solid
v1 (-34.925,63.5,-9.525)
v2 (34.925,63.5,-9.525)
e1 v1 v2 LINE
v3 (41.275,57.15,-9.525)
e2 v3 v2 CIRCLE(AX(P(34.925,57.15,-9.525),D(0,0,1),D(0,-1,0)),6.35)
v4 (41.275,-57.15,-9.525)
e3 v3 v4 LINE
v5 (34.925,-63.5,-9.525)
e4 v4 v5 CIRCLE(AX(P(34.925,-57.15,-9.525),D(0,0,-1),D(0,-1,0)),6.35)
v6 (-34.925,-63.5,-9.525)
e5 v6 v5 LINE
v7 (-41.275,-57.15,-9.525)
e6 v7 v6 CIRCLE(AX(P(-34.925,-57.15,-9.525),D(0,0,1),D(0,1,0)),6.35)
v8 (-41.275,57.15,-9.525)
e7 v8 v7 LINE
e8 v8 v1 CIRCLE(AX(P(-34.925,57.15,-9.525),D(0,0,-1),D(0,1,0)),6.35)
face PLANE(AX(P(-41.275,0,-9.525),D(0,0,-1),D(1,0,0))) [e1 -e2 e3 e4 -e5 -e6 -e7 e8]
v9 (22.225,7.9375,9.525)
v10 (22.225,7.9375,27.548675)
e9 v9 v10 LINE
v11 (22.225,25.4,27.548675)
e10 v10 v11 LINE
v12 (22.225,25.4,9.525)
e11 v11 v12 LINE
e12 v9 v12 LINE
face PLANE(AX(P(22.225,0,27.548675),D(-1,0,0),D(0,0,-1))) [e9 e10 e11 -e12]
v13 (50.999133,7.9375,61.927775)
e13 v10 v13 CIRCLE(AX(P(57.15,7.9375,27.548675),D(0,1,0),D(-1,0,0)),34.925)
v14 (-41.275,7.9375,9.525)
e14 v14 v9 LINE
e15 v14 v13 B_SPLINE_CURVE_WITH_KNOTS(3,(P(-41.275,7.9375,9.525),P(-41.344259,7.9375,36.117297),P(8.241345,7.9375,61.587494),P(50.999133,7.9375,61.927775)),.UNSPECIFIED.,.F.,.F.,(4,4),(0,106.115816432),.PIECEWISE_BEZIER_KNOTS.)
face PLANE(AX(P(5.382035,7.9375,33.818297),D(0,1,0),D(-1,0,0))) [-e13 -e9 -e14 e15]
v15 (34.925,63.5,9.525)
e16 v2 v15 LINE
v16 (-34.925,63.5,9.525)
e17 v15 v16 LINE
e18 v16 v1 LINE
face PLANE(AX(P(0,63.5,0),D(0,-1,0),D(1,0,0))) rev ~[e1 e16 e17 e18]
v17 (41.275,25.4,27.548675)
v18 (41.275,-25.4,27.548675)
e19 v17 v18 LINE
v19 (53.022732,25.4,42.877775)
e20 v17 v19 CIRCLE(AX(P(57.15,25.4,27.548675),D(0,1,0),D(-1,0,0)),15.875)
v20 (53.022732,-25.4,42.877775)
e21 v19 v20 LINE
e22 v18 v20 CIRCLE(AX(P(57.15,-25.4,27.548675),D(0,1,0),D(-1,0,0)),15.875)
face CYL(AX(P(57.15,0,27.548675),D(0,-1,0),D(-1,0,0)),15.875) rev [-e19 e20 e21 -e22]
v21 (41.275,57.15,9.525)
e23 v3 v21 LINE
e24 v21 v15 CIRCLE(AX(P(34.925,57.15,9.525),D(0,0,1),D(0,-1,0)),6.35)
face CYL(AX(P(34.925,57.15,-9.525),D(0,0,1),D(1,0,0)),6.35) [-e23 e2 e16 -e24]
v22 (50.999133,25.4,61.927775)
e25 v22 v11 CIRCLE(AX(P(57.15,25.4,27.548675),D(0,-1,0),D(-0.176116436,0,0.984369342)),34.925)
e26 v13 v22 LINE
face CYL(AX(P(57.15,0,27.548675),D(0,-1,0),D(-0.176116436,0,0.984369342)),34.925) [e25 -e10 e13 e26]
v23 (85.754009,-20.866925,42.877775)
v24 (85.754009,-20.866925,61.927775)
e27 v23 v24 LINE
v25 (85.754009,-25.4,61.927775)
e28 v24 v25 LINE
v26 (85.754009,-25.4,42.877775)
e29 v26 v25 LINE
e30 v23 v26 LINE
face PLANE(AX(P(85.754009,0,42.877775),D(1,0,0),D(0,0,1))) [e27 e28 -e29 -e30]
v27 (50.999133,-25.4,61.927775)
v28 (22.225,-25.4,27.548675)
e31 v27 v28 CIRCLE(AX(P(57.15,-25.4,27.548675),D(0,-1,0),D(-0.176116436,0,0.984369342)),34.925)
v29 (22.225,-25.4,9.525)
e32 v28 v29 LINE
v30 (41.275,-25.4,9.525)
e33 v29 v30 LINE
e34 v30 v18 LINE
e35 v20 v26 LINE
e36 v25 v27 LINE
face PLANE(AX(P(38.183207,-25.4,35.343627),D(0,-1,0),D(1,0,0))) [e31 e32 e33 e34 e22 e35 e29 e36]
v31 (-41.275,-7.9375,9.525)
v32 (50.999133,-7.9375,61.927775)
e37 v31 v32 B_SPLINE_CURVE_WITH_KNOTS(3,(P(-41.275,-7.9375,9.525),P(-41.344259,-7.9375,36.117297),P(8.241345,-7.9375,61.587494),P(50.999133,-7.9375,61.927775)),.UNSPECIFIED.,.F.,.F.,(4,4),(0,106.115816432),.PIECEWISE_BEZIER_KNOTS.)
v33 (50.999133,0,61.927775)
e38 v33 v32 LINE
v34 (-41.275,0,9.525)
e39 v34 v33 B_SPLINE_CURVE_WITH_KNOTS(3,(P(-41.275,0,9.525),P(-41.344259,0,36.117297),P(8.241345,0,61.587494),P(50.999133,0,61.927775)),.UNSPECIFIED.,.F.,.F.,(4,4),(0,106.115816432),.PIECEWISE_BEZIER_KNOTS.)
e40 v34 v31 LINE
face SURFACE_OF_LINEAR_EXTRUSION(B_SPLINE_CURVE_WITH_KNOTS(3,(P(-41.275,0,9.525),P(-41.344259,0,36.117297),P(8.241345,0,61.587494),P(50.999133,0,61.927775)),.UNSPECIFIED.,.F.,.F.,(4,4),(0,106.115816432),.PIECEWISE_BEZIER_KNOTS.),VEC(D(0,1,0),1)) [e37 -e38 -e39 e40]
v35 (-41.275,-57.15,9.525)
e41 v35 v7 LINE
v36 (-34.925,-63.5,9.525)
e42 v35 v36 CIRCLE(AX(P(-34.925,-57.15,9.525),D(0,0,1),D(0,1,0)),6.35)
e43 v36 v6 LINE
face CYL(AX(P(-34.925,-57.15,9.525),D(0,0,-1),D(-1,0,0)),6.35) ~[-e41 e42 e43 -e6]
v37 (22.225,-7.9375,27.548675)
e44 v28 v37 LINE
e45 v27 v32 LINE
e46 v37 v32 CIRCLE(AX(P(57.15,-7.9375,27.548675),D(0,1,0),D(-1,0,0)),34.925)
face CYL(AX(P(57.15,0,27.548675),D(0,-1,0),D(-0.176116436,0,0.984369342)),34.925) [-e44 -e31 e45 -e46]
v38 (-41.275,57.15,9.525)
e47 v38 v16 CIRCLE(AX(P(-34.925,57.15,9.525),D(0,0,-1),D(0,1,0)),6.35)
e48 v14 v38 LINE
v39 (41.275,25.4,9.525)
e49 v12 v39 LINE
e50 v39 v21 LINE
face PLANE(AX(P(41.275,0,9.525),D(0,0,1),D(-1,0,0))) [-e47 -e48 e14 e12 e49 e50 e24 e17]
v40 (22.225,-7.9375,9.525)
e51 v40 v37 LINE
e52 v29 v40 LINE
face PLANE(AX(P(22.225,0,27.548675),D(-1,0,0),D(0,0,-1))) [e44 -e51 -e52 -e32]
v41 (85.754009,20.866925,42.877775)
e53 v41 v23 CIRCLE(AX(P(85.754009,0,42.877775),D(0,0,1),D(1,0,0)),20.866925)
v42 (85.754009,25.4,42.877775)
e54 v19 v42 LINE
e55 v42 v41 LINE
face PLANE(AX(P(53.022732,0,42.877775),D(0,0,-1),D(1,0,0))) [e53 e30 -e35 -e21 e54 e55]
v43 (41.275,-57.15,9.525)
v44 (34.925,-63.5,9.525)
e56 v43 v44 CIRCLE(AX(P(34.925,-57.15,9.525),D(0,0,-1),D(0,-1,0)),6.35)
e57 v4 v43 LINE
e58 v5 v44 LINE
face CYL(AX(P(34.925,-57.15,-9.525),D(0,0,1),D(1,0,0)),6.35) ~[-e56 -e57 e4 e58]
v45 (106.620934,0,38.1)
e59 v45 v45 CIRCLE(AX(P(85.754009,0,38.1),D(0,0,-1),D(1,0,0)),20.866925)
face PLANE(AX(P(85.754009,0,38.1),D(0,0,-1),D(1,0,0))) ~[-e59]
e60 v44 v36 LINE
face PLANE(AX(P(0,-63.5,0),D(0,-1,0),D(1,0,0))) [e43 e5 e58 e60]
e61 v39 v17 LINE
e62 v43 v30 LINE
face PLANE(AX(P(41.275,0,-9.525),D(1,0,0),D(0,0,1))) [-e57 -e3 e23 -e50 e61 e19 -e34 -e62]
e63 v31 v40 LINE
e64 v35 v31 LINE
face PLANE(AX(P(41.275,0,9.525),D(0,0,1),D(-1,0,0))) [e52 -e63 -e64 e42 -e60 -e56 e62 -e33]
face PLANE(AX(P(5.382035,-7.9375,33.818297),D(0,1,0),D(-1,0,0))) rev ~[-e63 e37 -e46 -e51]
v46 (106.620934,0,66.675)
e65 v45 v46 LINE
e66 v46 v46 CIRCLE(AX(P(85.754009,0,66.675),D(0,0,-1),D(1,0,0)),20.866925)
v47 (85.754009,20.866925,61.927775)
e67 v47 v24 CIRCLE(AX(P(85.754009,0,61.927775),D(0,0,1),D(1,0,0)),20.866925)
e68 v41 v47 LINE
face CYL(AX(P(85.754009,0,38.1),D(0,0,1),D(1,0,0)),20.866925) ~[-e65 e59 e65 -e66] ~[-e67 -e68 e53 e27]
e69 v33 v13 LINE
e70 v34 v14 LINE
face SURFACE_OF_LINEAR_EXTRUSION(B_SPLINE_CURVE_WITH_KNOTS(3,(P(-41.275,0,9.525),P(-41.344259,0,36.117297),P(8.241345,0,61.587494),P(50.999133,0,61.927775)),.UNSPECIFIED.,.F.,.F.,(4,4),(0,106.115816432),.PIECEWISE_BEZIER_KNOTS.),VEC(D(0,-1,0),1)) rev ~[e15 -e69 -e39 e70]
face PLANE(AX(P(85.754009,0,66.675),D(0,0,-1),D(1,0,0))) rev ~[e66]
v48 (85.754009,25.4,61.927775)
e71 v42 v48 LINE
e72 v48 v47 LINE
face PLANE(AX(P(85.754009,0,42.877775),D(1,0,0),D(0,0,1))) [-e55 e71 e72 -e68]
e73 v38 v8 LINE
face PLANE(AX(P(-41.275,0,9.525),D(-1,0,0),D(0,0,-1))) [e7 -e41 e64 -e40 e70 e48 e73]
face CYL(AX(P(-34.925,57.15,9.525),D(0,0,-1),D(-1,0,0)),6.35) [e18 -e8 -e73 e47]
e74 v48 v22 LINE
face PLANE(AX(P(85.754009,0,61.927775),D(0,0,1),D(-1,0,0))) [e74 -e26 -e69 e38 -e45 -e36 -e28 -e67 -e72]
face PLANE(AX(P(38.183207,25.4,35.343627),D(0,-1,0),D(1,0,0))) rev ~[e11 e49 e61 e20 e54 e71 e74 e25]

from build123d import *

# Parameters (mm, degrees)
F1_DEPTH = 63.5
F0_W     = 29.9330746515
F0_H     = 19.05
F2_DEPTH = 25.4
F3_DEPTH = 7.9375
F5_R     = 6.35


# Not quite as in the source:
# - the program builds the solid bodies; features that only make, move or delete a surface that nothing else refers to are left out


with BuildPart() as f1:
    # F0 (on Front) → F1 (new body, symmetric)
    with BuildSketch(Plane.XZ):
        Polygon((-41.275, 9.525), (-41.275, -9.525), (41.275, -9.525), (41.275, 9.525), (22.225, 9.525), align=None)
    extrude(amount=F1_DEPTH, both=True)

    # F0 (on Front) → F2 (join, symmetric)
    with BuildSketch(Plane.XZ):
        with BuildLine():
            Line((22.225, 9.525), (41.275, 9.525))
            Line((41.275, 9.525), (41.275, 27.5486753512))
            ThreePointArc((41.275, 27.5486753512), (44.5496824671, 37.2051562356), (53.0227320404, 42.8777746134))
            Line((53.0227320404, 42.8777746134), (55.8209344745, 42.8777746134))
            Line((55.8209344745, 42.8777746134), (55.8209344745, 61.9277746134))
            Line((55.8209344745, 61.9277746134), (50.9991334821, 61.9277746134))
            ThreePointArc((50.9991334821, 61.9277746134), (30.3677797958, 49.9644801757), (22.225, 27.5486753512))
            Line((22.225, 27.5486753512), (22.225, 9.525))
        make_face()
        with Locations((70.7874718002, 52.4027746134)):
            Rectangle(F0_W, F0_H)
    extrude(amount=F2_DEPTH, both=True)

    # F0 (on Front) → F3 (join, symmetric)
    with BuildSketch(Plane.XZ):
        with BuildLine():
            add(Edge.make_bspline(
                [(-41.275, 9.525), (-41.3442589343, 36.1172966659), (8.2413451746, 61.5874938667), (50.9991334821, 61.9277746134)],
                knots=[0, 0, 0, 0, 106.1158164321, 106.1158164321, 106.1158164321, 106.1158164321], degree=3))
            Line((-41.275, 9.525), (22.225, 9.525))
            Line((22.225, 9.525), (22.225, 27.5486753512))
            ThreePointArc((22.225, 27.5486753512), (30.3677797958, 49.9644801757), (50.9991334821, 61.9277746134))
        make_face()
    extrude(amount=F3_DEPTH, both=True)

    # F0 (on Front) → F4 (revolve)
    with BuildSketch(Plane.XZ):
        Polygon((85.754009126, 66.675), (85.754009126, 61.9277746134), (85.754009126, 42.8777746134), (85.754009126, 38.1), (106.6209344745, 38.1), (106.6209344745, 66.675), align=None)
    revolve(axis=Axis((85.754009126, 0, 52.3875), (0, 0, -1)))

    # F5
    f5_edges = [f1.edges().sort_by_distance(p)[0] for p in [
        (-41.275, -63.5, 0),
        (41.275, -63.5, 0),
        (-41.275, 63.5, 0),
        (41.275, 63.5, 0),
    ]]
    fillet(f5_edges, radius=F5_R)


solid = f1.part
